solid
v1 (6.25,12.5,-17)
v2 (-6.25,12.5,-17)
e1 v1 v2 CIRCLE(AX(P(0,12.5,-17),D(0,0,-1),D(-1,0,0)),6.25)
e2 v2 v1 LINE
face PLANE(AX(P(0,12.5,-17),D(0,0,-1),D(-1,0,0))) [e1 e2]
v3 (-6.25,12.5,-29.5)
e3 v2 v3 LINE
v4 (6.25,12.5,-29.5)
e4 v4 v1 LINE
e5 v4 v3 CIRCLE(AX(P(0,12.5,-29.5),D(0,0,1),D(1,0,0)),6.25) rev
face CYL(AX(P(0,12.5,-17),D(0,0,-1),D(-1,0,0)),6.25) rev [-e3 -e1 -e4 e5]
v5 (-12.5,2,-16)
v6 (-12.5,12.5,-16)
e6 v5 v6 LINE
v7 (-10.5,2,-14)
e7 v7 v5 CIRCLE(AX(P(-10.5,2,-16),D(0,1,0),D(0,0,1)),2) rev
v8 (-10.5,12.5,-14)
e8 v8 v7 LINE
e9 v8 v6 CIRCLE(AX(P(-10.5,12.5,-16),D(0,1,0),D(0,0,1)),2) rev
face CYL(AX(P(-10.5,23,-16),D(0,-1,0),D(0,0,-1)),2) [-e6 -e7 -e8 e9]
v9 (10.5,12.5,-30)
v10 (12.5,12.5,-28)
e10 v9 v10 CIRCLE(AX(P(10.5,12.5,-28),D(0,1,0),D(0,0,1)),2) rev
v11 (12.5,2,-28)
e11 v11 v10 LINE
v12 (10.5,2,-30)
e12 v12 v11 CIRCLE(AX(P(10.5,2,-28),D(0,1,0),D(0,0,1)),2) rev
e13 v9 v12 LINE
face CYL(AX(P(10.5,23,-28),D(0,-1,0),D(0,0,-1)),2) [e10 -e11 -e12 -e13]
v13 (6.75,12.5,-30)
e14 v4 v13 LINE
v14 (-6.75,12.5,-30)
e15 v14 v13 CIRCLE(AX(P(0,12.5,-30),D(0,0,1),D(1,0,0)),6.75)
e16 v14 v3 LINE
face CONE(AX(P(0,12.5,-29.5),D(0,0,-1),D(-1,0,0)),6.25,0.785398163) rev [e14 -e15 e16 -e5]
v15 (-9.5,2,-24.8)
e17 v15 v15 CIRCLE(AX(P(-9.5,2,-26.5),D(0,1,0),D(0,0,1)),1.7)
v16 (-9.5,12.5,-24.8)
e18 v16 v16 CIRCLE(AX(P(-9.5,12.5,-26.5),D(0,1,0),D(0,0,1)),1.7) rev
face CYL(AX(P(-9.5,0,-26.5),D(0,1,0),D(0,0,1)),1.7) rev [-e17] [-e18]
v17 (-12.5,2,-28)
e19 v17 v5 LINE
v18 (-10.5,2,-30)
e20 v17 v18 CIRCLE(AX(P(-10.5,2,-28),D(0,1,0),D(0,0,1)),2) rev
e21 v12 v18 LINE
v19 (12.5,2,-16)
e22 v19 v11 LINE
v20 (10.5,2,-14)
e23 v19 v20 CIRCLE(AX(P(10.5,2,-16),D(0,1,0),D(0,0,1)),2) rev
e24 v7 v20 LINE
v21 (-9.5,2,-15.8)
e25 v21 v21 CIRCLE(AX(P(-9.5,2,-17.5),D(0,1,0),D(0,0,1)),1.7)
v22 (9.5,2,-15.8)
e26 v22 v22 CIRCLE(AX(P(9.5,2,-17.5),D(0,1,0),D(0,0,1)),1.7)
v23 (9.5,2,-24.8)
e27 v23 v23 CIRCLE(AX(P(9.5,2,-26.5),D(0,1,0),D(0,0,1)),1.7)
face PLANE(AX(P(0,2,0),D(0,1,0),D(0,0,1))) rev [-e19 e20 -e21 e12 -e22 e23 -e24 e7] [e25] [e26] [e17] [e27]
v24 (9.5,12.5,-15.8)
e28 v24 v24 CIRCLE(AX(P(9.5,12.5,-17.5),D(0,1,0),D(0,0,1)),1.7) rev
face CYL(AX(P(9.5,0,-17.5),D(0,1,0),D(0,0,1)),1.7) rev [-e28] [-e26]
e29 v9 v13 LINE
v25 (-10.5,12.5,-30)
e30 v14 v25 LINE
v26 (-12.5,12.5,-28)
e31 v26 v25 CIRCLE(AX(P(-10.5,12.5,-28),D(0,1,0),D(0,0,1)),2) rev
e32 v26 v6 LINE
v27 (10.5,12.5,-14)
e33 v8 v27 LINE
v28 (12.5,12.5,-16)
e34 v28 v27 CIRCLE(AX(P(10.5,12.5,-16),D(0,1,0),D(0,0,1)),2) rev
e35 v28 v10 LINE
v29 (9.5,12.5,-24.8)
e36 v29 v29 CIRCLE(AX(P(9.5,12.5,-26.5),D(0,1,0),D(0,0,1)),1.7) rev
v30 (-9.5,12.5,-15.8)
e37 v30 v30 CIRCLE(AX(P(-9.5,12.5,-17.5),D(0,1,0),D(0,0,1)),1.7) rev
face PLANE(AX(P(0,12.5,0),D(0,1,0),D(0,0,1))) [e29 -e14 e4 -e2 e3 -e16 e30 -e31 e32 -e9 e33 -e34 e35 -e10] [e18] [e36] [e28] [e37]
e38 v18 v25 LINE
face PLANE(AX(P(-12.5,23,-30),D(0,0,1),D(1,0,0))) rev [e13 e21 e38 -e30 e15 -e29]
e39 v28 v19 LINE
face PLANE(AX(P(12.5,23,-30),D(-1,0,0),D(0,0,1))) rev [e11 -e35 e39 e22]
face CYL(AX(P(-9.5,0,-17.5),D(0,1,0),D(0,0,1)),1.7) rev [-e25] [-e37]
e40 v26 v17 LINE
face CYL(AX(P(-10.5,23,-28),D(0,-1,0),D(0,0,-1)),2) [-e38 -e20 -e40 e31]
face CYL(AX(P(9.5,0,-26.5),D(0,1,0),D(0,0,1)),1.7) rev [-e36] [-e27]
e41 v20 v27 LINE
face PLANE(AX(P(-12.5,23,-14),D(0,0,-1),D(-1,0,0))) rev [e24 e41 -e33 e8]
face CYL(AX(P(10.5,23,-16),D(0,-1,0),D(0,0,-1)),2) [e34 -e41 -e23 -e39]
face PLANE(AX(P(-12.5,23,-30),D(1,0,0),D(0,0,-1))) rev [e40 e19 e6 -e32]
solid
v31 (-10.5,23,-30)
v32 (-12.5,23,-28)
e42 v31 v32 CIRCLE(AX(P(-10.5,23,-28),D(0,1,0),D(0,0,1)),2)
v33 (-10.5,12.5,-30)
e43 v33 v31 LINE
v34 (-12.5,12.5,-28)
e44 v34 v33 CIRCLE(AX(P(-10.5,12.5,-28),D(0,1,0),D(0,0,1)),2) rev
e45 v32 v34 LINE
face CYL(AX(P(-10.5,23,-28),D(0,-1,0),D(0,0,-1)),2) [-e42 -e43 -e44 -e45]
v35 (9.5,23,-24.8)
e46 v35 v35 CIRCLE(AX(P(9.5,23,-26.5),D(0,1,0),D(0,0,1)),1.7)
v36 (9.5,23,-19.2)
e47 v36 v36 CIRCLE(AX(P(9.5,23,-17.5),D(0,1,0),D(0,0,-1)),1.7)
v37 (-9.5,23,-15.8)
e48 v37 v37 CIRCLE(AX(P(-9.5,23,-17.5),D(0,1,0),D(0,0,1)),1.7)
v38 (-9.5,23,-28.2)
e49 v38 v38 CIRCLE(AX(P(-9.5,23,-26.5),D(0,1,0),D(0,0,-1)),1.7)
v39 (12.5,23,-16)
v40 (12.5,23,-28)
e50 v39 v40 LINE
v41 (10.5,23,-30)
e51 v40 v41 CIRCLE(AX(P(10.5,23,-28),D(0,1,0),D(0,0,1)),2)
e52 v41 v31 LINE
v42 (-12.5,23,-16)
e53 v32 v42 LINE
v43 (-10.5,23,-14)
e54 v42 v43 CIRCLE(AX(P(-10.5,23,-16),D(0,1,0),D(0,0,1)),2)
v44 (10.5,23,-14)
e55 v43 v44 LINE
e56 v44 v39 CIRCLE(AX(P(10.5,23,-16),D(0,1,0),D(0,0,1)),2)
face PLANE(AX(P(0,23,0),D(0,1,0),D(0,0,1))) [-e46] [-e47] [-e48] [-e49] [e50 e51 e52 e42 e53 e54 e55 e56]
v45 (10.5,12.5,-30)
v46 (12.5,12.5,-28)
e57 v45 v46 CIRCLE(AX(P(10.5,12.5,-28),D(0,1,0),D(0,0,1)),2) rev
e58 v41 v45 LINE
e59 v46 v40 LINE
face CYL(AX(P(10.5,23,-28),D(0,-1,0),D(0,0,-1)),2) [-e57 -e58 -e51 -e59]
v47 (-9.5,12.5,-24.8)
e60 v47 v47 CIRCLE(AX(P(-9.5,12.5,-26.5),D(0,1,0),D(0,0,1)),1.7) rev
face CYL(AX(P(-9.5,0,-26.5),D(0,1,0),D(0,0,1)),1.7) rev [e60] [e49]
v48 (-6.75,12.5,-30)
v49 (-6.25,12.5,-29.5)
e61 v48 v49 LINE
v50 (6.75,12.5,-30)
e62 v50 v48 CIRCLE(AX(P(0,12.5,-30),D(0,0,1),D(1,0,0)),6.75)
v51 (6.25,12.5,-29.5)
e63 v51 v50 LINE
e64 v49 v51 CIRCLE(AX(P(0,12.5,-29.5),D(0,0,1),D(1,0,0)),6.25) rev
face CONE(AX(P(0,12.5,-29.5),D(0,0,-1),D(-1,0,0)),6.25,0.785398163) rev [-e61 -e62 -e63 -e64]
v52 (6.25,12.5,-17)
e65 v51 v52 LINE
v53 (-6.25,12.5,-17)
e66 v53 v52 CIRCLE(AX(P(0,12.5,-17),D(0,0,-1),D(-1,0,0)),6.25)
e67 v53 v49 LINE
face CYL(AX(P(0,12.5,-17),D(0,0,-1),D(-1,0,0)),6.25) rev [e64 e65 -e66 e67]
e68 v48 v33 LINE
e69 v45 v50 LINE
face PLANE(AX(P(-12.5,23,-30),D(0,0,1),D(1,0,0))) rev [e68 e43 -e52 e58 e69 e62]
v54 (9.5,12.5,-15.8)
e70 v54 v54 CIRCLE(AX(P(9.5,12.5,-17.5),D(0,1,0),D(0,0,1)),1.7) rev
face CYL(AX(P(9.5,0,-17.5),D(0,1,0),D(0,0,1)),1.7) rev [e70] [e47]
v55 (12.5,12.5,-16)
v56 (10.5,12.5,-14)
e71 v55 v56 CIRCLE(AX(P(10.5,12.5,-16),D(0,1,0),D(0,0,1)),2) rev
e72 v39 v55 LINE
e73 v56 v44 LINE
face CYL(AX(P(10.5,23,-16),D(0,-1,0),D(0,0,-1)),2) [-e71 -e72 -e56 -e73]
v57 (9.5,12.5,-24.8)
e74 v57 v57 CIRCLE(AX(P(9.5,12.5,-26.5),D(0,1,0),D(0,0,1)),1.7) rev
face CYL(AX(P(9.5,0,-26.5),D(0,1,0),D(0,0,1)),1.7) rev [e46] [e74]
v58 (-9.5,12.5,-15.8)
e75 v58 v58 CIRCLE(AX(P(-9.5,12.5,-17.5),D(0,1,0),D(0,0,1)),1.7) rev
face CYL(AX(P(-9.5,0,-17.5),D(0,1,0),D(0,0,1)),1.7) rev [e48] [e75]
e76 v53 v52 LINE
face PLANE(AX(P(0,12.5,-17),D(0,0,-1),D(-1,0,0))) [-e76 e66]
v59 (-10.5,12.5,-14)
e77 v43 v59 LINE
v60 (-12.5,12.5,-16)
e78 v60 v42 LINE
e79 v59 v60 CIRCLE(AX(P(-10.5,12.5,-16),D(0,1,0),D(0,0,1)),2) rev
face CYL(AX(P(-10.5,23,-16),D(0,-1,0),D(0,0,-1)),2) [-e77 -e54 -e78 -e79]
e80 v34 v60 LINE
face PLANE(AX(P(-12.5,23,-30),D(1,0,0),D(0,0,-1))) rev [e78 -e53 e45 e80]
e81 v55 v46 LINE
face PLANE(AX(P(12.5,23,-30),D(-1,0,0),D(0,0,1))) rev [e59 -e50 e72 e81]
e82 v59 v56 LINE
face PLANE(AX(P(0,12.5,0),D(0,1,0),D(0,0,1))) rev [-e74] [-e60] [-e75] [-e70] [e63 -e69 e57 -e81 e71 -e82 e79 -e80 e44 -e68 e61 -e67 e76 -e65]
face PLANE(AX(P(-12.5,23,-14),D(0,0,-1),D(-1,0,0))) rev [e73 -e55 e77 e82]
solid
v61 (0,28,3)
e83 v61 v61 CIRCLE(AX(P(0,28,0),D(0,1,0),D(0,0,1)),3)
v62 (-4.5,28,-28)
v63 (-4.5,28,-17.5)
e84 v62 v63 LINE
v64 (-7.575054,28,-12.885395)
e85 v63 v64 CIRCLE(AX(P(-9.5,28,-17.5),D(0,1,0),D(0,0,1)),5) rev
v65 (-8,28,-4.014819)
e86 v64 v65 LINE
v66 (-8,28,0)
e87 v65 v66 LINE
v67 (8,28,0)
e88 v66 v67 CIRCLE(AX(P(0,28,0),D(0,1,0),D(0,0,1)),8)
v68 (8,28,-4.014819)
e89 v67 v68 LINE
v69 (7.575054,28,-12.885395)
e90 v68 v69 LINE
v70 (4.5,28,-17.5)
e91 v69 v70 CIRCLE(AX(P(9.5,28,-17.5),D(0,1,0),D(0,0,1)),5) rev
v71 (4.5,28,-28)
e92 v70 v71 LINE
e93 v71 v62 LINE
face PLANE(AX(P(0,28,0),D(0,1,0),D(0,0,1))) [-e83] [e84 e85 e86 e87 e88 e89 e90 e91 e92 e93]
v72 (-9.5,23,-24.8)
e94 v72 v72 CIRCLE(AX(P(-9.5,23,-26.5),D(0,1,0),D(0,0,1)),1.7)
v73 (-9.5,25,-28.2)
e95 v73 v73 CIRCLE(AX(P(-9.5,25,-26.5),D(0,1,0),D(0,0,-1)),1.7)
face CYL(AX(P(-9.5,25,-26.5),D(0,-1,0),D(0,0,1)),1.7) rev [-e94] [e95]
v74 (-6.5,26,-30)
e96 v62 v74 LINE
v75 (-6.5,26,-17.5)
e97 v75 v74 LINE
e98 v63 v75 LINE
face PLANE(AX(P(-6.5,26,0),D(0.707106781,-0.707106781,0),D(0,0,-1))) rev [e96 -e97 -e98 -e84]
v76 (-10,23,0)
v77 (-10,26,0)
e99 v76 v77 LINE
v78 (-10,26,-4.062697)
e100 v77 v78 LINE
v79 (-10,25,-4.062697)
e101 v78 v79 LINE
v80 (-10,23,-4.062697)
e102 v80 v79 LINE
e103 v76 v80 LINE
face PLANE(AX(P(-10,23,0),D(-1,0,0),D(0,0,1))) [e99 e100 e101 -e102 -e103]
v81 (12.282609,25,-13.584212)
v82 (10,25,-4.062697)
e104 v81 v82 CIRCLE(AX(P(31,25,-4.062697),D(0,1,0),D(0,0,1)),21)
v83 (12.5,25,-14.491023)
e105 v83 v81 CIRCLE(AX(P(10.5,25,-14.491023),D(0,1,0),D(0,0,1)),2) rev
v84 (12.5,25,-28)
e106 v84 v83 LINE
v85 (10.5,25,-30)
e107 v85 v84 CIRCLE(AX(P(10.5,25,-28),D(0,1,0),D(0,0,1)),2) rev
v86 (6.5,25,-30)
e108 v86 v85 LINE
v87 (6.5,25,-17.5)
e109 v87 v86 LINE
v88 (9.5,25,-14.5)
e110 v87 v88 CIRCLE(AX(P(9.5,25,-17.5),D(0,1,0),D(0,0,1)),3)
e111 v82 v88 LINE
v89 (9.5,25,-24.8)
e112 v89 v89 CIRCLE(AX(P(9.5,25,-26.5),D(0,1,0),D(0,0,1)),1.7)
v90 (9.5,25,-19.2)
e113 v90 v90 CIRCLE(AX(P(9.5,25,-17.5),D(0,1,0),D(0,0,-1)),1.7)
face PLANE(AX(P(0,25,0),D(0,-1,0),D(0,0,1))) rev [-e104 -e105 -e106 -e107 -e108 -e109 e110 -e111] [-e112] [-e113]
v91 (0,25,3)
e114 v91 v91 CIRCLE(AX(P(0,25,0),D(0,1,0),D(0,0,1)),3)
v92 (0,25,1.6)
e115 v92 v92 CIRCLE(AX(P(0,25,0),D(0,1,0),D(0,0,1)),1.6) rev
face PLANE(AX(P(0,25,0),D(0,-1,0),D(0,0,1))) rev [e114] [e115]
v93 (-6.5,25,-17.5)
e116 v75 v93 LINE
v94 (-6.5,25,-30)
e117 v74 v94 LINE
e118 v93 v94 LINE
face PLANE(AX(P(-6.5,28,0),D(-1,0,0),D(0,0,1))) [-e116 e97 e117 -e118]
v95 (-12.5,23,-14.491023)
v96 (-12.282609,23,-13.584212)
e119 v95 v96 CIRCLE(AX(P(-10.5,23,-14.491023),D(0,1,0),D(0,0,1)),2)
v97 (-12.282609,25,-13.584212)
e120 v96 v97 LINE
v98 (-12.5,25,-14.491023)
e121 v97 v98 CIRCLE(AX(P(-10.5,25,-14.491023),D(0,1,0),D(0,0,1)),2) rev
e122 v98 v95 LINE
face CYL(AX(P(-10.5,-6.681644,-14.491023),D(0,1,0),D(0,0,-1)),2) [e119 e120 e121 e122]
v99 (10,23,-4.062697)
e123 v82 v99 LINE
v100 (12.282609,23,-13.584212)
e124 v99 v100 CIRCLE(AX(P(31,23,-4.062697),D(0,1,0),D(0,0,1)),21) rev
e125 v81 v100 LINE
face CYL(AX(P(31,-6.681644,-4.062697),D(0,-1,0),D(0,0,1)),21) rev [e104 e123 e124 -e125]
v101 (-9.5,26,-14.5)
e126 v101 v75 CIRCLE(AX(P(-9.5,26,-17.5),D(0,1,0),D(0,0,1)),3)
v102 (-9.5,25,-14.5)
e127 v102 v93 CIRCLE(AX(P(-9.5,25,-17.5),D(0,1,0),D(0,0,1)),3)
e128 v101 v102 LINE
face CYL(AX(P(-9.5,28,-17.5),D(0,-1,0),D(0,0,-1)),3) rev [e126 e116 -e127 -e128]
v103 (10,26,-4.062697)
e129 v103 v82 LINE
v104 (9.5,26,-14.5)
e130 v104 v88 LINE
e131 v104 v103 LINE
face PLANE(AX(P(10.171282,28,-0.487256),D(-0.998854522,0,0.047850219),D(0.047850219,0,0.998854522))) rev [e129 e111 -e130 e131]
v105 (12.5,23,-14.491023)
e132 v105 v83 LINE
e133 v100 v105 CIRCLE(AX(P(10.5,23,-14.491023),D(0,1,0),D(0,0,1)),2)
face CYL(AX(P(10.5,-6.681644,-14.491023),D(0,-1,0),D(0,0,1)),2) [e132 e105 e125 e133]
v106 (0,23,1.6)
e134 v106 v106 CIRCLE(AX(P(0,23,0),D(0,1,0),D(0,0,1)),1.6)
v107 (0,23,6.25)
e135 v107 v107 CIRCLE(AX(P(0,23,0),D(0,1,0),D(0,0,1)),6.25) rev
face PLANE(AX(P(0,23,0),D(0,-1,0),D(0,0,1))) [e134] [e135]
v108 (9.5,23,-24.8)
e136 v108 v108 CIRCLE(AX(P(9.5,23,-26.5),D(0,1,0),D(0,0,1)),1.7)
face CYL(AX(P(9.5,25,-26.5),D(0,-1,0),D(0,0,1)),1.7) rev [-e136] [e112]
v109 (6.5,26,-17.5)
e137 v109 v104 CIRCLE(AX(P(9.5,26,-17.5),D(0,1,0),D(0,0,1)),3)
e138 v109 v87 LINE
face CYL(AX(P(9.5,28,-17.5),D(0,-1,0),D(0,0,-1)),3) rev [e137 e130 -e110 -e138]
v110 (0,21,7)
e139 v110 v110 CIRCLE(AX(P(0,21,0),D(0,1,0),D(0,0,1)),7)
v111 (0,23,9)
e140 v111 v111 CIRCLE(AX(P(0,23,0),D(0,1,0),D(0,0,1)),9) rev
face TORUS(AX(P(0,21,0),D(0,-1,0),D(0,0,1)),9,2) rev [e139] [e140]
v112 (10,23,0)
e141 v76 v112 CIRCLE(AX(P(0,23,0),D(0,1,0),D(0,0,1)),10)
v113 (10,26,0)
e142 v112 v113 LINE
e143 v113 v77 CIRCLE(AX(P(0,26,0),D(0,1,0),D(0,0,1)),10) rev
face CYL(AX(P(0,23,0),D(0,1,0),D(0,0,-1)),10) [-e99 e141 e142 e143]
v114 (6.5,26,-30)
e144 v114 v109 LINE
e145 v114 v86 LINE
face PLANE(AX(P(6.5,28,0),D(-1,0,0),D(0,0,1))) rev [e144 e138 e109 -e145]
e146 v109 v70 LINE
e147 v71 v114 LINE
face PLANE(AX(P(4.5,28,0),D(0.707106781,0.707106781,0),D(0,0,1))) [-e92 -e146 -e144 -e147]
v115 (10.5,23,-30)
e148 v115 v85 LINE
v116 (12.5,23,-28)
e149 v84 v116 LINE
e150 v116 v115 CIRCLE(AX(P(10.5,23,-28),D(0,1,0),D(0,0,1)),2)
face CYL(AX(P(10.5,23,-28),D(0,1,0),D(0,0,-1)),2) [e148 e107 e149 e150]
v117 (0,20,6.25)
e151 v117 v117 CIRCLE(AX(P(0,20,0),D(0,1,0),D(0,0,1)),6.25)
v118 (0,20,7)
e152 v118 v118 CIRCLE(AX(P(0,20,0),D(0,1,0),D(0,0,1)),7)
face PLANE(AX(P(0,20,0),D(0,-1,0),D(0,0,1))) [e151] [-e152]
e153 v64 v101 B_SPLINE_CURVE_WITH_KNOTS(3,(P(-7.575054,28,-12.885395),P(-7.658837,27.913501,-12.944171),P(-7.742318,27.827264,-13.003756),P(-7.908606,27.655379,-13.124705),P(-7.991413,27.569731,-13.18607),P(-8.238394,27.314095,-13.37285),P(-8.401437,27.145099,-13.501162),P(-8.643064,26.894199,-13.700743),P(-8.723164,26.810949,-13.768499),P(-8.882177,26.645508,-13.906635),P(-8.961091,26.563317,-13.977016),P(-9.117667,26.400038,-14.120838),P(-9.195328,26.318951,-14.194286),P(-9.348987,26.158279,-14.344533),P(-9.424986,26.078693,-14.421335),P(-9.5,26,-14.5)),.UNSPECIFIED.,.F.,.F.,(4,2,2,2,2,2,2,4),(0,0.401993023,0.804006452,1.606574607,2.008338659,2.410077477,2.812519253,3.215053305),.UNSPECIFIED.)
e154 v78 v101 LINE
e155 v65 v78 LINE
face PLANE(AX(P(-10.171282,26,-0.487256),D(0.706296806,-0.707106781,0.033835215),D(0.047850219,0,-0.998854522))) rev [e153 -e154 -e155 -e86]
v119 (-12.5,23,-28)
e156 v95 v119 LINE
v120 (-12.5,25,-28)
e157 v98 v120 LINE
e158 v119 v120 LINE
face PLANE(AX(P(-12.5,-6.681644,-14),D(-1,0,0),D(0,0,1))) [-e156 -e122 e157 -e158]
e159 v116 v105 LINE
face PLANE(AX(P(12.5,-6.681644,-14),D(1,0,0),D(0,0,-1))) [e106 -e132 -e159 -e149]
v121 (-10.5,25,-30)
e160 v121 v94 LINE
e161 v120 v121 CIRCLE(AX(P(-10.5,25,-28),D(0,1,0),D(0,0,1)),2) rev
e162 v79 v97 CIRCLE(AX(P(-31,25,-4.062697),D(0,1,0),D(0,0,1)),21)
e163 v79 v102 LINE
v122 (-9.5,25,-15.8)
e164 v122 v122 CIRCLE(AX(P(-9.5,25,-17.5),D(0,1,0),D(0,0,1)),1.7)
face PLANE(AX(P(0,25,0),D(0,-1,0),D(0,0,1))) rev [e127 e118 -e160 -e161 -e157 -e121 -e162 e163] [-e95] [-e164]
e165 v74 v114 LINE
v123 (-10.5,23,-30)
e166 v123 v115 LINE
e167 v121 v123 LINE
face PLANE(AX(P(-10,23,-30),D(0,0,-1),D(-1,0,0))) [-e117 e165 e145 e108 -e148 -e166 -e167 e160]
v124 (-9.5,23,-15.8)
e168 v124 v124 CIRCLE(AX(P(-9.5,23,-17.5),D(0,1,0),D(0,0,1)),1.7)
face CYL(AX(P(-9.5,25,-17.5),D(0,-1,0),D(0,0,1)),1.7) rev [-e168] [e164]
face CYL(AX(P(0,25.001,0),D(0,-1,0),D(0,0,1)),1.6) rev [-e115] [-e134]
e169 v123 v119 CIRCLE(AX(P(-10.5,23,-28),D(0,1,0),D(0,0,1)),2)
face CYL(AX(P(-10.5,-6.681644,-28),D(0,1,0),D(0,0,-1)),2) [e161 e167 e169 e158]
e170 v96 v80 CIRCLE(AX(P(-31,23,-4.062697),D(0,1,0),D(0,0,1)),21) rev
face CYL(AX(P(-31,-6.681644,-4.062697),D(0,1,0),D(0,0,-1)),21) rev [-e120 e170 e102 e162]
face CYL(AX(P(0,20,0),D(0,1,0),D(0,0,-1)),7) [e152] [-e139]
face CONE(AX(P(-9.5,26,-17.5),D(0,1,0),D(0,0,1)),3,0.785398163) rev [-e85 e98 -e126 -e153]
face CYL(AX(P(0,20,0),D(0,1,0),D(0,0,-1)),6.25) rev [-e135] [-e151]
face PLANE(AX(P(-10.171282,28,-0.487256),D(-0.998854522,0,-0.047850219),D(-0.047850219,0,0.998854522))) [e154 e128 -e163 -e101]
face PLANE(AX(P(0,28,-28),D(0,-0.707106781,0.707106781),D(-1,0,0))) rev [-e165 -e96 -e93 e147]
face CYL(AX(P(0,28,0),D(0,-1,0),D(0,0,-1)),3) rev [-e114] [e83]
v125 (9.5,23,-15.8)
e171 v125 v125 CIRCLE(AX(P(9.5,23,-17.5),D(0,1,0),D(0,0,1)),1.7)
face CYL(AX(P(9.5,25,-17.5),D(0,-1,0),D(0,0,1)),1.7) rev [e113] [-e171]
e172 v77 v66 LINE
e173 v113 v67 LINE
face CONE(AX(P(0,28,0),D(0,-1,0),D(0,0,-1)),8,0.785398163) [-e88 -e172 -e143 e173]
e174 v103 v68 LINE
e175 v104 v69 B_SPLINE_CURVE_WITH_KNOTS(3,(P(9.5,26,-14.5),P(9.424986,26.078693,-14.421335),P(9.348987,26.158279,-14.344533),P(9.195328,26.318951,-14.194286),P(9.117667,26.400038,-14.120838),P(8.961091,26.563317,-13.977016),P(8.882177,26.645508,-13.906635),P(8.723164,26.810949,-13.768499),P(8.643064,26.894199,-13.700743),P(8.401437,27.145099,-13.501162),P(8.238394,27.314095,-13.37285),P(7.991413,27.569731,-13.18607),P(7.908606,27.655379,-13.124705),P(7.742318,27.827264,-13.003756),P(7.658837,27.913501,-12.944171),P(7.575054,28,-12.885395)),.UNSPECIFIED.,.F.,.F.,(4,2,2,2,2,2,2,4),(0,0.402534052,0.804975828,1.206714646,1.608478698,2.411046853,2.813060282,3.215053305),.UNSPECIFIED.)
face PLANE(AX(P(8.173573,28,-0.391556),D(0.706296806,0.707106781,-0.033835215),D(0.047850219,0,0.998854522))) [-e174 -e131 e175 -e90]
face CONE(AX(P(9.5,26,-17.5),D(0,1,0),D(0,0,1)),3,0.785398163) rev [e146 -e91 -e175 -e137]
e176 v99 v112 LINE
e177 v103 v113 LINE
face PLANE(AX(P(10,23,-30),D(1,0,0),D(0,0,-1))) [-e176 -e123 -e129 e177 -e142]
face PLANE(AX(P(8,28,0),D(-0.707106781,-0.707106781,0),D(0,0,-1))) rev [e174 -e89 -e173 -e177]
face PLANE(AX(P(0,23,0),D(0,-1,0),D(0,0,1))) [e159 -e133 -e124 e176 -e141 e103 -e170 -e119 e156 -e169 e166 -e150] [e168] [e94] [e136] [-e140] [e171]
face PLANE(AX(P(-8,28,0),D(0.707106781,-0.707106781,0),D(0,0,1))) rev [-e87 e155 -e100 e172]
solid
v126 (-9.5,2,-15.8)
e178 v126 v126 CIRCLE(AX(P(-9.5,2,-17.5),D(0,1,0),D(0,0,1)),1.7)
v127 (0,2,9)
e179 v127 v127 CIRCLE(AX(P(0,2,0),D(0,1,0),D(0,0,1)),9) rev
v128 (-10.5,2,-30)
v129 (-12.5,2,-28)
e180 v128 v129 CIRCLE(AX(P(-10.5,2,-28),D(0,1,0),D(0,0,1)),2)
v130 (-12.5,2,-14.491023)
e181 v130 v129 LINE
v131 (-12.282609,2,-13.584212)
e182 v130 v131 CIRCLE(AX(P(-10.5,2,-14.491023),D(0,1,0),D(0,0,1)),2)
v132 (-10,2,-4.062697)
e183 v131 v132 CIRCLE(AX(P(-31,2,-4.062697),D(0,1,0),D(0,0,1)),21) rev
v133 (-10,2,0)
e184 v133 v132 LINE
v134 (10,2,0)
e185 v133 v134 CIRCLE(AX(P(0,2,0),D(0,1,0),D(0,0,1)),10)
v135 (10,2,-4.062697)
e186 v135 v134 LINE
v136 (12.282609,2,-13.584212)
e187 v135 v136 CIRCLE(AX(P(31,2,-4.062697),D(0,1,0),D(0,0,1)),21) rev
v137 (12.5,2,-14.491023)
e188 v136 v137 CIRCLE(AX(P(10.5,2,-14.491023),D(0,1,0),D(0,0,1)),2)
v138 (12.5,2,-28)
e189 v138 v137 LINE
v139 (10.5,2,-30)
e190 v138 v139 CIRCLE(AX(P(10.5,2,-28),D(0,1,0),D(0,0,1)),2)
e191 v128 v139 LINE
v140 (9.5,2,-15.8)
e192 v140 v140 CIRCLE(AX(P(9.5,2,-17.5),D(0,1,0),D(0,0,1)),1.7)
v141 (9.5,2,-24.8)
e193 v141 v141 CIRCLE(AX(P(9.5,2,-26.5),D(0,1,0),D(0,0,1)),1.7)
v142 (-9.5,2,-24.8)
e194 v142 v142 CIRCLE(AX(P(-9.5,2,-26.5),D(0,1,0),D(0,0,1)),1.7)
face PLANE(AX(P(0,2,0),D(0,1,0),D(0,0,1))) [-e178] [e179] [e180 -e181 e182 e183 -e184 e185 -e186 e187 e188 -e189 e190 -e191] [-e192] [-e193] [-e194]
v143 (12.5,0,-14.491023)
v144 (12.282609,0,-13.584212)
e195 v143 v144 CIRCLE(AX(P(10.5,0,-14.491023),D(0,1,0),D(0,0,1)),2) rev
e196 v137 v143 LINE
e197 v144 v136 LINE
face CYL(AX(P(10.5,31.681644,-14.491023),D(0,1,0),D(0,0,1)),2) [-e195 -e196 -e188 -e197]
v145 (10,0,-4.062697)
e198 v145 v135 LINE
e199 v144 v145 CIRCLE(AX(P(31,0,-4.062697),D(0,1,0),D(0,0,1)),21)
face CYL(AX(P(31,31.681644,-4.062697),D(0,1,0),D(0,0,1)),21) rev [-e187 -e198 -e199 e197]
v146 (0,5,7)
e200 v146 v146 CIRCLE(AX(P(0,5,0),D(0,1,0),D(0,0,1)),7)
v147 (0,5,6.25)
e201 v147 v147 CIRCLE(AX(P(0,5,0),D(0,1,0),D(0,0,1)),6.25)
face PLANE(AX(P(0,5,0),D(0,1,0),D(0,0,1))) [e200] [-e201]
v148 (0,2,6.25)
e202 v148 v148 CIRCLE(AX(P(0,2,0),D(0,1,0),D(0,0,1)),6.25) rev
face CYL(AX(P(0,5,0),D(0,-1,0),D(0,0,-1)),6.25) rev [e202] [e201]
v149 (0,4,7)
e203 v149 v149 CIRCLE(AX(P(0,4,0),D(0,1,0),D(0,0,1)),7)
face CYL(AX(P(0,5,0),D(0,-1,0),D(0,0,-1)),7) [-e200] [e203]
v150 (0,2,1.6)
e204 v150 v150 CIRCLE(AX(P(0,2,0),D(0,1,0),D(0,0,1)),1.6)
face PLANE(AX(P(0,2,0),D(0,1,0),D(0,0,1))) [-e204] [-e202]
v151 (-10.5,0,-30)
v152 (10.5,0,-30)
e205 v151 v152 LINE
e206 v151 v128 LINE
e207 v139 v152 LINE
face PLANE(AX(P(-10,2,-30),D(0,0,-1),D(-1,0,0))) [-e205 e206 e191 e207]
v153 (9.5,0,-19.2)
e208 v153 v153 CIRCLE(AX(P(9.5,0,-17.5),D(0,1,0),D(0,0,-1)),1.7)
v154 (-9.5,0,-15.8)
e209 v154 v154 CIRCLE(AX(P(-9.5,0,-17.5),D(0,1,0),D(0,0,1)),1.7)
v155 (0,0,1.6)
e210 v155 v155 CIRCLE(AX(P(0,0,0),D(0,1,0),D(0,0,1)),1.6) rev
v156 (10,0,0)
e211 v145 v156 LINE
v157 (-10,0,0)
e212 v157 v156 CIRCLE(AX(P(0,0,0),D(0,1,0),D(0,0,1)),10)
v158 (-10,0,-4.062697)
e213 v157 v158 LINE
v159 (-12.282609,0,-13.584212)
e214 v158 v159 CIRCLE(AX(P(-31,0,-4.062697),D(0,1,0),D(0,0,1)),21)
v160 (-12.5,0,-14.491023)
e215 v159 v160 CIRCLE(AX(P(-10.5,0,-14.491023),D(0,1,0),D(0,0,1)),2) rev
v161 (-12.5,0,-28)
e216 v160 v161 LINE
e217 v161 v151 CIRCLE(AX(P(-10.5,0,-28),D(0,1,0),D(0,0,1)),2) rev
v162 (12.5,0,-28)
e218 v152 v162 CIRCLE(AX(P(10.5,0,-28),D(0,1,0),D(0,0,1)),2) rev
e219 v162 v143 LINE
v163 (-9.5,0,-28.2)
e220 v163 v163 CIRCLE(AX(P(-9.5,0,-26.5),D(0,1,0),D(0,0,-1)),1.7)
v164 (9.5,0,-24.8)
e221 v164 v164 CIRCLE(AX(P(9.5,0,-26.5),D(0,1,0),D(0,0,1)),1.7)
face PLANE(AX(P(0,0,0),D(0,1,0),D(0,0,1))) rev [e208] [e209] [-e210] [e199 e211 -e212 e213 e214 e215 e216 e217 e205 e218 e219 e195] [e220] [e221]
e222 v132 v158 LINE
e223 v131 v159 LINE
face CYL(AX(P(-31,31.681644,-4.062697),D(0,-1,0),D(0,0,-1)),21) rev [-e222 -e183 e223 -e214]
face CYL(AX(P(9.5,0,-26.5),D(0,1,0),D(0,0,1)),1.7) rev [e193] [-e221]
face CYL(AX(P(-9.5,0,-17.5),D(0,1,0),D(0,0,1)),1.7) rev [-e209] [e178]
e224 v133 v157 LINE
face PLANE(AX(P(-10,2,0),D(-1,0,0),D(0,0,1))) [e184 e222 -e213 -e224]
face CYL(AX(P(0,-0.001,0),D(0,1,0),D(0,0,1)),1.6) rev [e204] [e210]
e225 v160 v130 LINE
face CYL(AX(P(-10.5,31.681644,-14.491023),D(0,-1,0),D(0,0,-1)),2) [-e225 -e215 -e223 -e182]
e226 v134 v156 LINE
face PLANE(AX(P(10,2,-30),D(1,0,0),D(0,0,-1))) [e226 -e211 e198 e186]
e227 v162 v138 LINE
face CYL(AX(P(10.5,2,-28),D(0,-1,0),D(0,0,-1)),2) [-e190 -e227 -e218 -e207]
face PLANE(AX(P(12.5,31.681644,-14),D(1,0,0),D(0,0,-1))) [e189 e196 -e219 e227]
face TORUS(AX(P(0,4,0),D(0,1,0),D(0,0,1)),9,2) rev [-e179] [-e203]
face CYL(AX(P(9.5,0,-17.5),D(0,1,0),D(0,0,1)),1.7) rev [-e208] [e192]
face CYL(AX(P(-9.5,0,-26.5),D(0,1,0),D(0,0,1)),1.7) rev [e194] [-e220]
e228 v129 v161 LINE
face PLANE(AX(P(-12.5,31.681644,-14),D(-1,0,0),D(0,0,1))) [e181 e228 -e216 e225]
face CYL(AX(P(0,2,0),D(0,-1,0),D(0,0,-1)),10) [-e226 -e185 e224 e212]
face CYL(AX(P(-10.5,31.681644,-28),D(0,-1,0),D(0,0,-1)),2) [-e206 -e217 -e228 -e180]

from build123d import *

# Parameters (mm, degrees)
SKETCH_2_R          = 10
EXTRUDE_1_DEPTH     = 2
SKETCH_3_R          = 7
SKETCH_3_R_2        = 6.25
EXTRUDE_2_DEPTH     = 3
CUT_EXTRUDE_1_REACH = 16.457
SKETCH_4_R          = 1.6
SKETCH_6_R          = 1.6
EXTRUDE_3_DEPTH     = 2
SKETCH_11_W         = 25
SKETCH_11_H         = 16
EXTRUDE_6_DEPTH     = 2
SKETCH_12_W         = 25
SKETCH_12_H         = 16
EXTRUDE_7_DEPTH     = 21
SKETCH_13_R         = 6.25
CUT_EXTRUDE_4_DEPTH = 13
SKETCH_14_R         = 1.7
CUT_EXTRUDE_5_DEPTH = 40.815198103
FILLET_4_R          = 21
FILLET_5_R          = 2
FILLET_6_R          = 2
CHAMFER_1_SIZE      = 0.5
FILLET_7_R          = 2
SKETCH_15_R         = 3
EXTRUDE_9_DEPTH     = 3
CHAMFER_2_SIZE      = 2


with BuildPart() as part:
    # 草图2 → 凸台-拉伸1 (new body)
    with BuildSketch(Plane(origin=(0, 0, 0), x_dir=(1, 0, 0), z_dir=(0, 1, 0))):
        with Locations(Location((0, 0, 0), (0, 0, 270))):
            Circle(SKETCH_2_R)
    extrude(amount=EXTRUDE_1_DEPTH)

    # 草图3 → 凸台-拉伸2 (add)
    with BuildSketch(Plane(origin=(0, 2, 0), x_dir=(1, 0, 0), z_dir=(0, 1, 0))):
        with Locations(Location((0, 0, 0), (0, 0, 270))):
            Circle(SKETCH_3_R)
        with Locations(Location((0, 0, 0), (0, 0, 270))):
            Circle(SKETCH_3_R_2, mode=Mode.SUBTRACT)
    extrude(amount=EXTRUDE_2_DEPTH)

    # 草图4 → 切除-拉伸1 (cut, up to next)
    with BuildSketch(Plane(origin=(0, 2, 0), x_dir=(1, 0, 0), z_dir=(0, 1, 0)), mode=Mode.PRIVATE) as cut_extrude_1_sk1:
        with Locations(Location((0, 0, 0), (0, 0, 270))):
            Circle(SKETCH_4_R)
    cut_extrude_1_tool1 = extrude(cut_extrude_1_sk1.sketch, amount=-CUT_EXTRUDE_1_REACH, mode=Mode.PRIVATE) & part.part
    add(cut_extrude_1_tool1.solids().sort_by_distance((0, 2, 0))[0], mode=Mode.SUBTRACT)

    # 草图6 → 凸台-拉伸3 (add)
    with BuildSketch(Plane.XZ):
        with BuildLine():
            Line((-10, 0), (-10, -30))
            Line((-10, -30), (10, -30))
            Line((10, -30), (10, 0))
            ThreePointArc((10, 0), (0, 10), (-10, 0))
        make_face()
        with Locations(Location((0, 0, 0), (0, 0, 90))):
            Circle(SKETCH_6_R, mode=Mode.SUBTRACT)
    extrude(amount=-EXTRUDE_3_DEPTH)

    # 草图11 → 凸台-拉伸6 (add)
    with BuildSketch(Plane.XZ):
        with Locations((0, -22)):
            Rectangle(SKETCH_11_W, SKETCH_11_H)
    extrude(amount=-EXTRUDE_6_DEPTH)


with BuildPart() as body_2:
    # 草图12 → 凸台-拉伸7 (new body)
    with BuildSketch(Plane(origin=(0, 2, 0), x_dir=(1, 0, 0), z_dir=(0, 1, 0))):
        with Locations((0, 22)):
            Rectangle(SKETCH_12_W, SKETCH_12_H)
    extrude(amount=EXTRUDE_7_DEPTH)

    # 草图13 → 切除-拉伸4 (cut)
    with BuildSketch(Plane(origin=(0, 0, -30), x_dir=(-1, 0, 0), z_dir=(0, 0, -1))):
        with Locations((0, 12.5)):
            Circle(SKETCH_13_R)
    extrude(amount=-CUT_EXTRUDE_4_DEPTH, mode=Mode.SUBTRACT)


with BuildPart() as cut_extrude_5_tool:
    # 草图14 → 切除-拉伸5 (new, through all)
    with BuildSketch(Plane(origin=(0, 23, 0), x_dir=(1, 0, 0), z_dir=(0, 1, 0))):
        with Locations(Location((9.5, 26.5, 0), (0, 0, 270))):
            Circle(SKETCH_14_R)
        with Locations(Location((-9.5, 26.5, 0), (0, 0, 270))):
            Circle(SKETCH_14_R)
        with Locations(Location((9.5, 17.5, 0), (0, 0, 270))):
            Circle(SKETCH_14_R)
        with Locations(Location((-9.5, 17.5, 0), (0, 0, 270))):
            Circle(SKETCH_14_R)
    extrude(amount=-CUT_EXTRUDE_5_DEPTH)


with BuildPart() as part_1:
    add(part.part)

    # 切除-拉伸5: cut by cut_extrude_5_tool
    add(cut_extrude_5_tool.part, mode=Mode.SUBTRACT)

    # 圆角4
    # the kernel refuses this fillet: 21 mm, written as the material it adds along each edge
    with BuildSketch(Plane(origin=(-10, 2, -14), x_dir=(0, 0, 1), z_dir=(0, -1, 0)), Plane(origin=(10, 0, -14), x_dir=(0, 0, 1), z_dir=(0, 1, 0))) as fillet_4_piece_1:
        with BuildLine():
            CenterArc((9.937303457, 21), FILLET_4_R, 241.757462816, 28.242537184)
            Line((0, 2.5), (0, 0))
            Line((0, 0), (9.937303457, 0))
        make_face()
    extrude(amount=2)

    # 圆角5
    fillet_5_edges = [part_1.edges().sort_by_distance(p)[0] for p in [
        (12.5, 1, -30),
        (-12.5, 1, -14),
        (-12.5, 1, -30),
        (12.5, 1, -14),
    ]]
    fillet(fillet_5_edges, radius=FILLET_5_R)

    # 圆角7
    fillet_7_edges = [part_1.edges().sort_by_distance(p)[0] for p in [
        (0, 2, -7),
    ]]
    fillet(fillet_7_edges, radius=FILLET_7_R)


with BuildPart() as body_2_1:
    add(body_2.part)

    # 切除-拉伸5: cut by cut_extrude_5_tool
    add(cut_extrude_5_tool.part, mode=Mode.SUBTRACT)

    # 圆角6
    fillet_6_edges = [body_2_1.edges().sort_by_distance(p)[0] for p in [
        (-12.5, 12.5, -30),
        (12.5, 12.5, -30),
        (12.5, 12.5, -14),
        (-12.5, 12.5, -14),
    ]]
    fillet(fillet_6_edges, radius=FILLET_6_R)

    # 倒角1
    chamfer_1_edges = [body_2_1.edges().sort_by_distance(p)[0] for p in [
        (6.25, 12.5, -30),
    ]]
    chamfer(chamfer_1_edges, length=CHAMFER_1_SIZE)


with BuildPart() as body_3:
    # 镜向2: mirrored copy
    add(part_1.part.mirror(Plane.ZX.offset(12.5)))

    # 草图15 → 凸台-拉伸9 (add)
    with BuildSketch(Plane(origin=(0, 25, 0), x_dir=(1, 0, 0), z_dir=(0, 1, 0))):
        with BuildLine():
            Line((-6.5, 26.5), (-6.5, 17.5))
            ThreePointArc((-6.5, 17.5), (-7.378679656, 15.378679656), (-9.5, 14.5))
            Line((-9.5, 14.5), (-10, 4.062696543))
            Line((-10, 4.062696543), (-10, 0))
            ThreePointArc((-10, 0), (0, -10), (10, 0))
            Line((10, 0), (10, 4.062696543))
            Line((10, 4.062696543), (9.5, 14.5))
            ThreePointArc((9.5, 14.5), (7.378679656, 15.378679656), (6.5, 17.5))
            Line((6.5, 17.5), (6.5, 26.5))
            Line((6.5, 26.5), (6.5, 30))
            Line((6.5, 30), (-6.5, 30))
            Line((-6.5, 30), (-6.5, 26.5))
        make_face()
        with Locations(Location((0, 0, 0), (0, 0, 270))):
            Circle(SKETCH_15_R, mode=Mode.SUBTRACT)
    extrude(amount=EXTRUDE_9_DEPTH)

    # 倒角2
    # the kernel refuses this chamfer: 2 mm, written as the material it takes off along each edge
    with BuildSketch(Plane(origin=(9.5, 28, -17.5), x_dir=(0.9895999464390007, 0, -0.1438469534189959), z_dir=(-0.1438469534189959, 0, -0.9895999464390007))) as chamfer_2_piece_1:
        Polygon((3 + CHAMFER_2_SIZE, 0), (3, CHAMFER_2_SIZE), (3, 0), align=None)
    revolve(axis=Axis((9.5, 28, -17.5), (0, -1, 0)), revolution_arc=188.27051452, mode=Mode.SUBTRACT)
    with BuildSketch(Plane(origin=(-6.5, 28, -17.5), x_dir=(0, -1, 0), z_dir=(0, 0, -1))) as chamfer_2_piece_2:
        Polygon((CHAMFER_2_SIZE, 0), (0, -CHAMFER_2_SIZE), (0, 0), align=None)
    extrude(amount=17.643365976, mode=Mode.SUBTRACT)
    with BuildSketch(Plane(origin=(-9.5, 28, -17.5), x_dir=(1, 0, 0), z_dir=(0, 0, -1))) as chamfer_2_piece_3:
        Polygon((3, CHAMFER_2_SIZE), (3 + CHAMFER_2_SIZE, 0), (3, 0), align=None)
    revolve(axis=Axis((-9.5, 28, -17.5), (0, -1, 0)), revolution_arc=188.27051452, mode=Mode.SUBTRACT)
    with BuildSketch(Plane(origin=(-9.253888809, 28, -19.637474364), x_dir=(0, -1, 0), z_dir=(-0.0478502194693744, 0, 0.9988545221886582))) as chamfer_2_piece_4:
        Polygon((CHAMFER_2_SIZE, 0), (0, CHAMFER_2_SIZE), (0, 0), align=None)
    extrude(amount=20.736004819, mode=Mode.SUBTRACT)
    with BuildSketch(Plane(origin=(6.5, 28, -35.143365976), x_dir=(-1, 0, 0), z_dir=(0, 0, 1))) as chamfer_2_piece_5:
        Polygon((CHAMFER_2_SIZE, 0), (0, CHAMFER_2_SIZE), (0, 0), align=None)
    extrude(amount=17.643365976, mode=Mode.SUBTRACT)
    with BuildSketch(Plane(origin=(11.643365976, 28, -30), x_dir=(0, -1, 0), z_dir=(-1, 0, 0))) as chamfer_2_piece_6:
        Polygon((CHAMFER_2_SIZE, 0), (0, CHAMFER_2_SIZE), (0, 0), align=None)
    extrude(amount=23.286731952, mode=Mode.SUBTRACT)
    with BuildSketch(Plane(origin=(-10, 28, -9.206062519), x_dir=(0, -1, 0), z_dir=(0, 0, 1)), Plane(origin=(10, 28, 0), x_dir=(0, -1, 0), z_dir=(0, 0, -1))) as chamfer_2_piece_7:
        Polygon((CHAMFER_2_SIZE, 0), (0, CHAMFER_2_SIZE), (0, 0), align=None)
    extrude(amount=9.206062519, mode=Mode.SUBTRACT)
    with BuildSketch(Plane(origin=(0, 28, 0), x_dir=(-1, 0, 0), z_dir=(0, 0, -1))) as chamfer_2_piece_8:
        Polygon((10, -CHAMFER_2_SIZE), (10 - CHAMFER_2_SIZE, 0), (10, 0), align=None)
    revolve(axis=Axis((0, 28, 0), (0, 1, 0)), revolution_arc=180, mode=Mode.SUBTRACT)
    with BuildSketch(Plane(origin=(10.246111191, 28, 1.074777822), x_dir=(-0.9988545221886582, 0, 0.04785021946937484), z_dir=(-0.04785021946937484, 0, -0.9988545221886582))) as chamfer_2_piece_9:
        Polygon((CHAMFER_2_SIZE, 0), (0, -CHAMFER_2_SIZE), (0, 0), align=None)
    extrude(amount=20.736004819, mode=Mode.SUBTRACT)


with BuildPart() as body_4:
    # Split Bodies 2: the piece on the far side of the plane
    add(body_2_1.part)
    split(bisect_by=Plane.ZX.offset(12.5), keep=Keep.BOTTOM)


with BuildPart() as body_2_2:
    add(body_2_1.part)

    # Split Bodies 2
    split(bisect_by=Plane.ZX.offset(12.5), keep=Keep.TOP)


solid = Compound([part_1.part, body_3.part, body_4.part, body_2_2.part])
